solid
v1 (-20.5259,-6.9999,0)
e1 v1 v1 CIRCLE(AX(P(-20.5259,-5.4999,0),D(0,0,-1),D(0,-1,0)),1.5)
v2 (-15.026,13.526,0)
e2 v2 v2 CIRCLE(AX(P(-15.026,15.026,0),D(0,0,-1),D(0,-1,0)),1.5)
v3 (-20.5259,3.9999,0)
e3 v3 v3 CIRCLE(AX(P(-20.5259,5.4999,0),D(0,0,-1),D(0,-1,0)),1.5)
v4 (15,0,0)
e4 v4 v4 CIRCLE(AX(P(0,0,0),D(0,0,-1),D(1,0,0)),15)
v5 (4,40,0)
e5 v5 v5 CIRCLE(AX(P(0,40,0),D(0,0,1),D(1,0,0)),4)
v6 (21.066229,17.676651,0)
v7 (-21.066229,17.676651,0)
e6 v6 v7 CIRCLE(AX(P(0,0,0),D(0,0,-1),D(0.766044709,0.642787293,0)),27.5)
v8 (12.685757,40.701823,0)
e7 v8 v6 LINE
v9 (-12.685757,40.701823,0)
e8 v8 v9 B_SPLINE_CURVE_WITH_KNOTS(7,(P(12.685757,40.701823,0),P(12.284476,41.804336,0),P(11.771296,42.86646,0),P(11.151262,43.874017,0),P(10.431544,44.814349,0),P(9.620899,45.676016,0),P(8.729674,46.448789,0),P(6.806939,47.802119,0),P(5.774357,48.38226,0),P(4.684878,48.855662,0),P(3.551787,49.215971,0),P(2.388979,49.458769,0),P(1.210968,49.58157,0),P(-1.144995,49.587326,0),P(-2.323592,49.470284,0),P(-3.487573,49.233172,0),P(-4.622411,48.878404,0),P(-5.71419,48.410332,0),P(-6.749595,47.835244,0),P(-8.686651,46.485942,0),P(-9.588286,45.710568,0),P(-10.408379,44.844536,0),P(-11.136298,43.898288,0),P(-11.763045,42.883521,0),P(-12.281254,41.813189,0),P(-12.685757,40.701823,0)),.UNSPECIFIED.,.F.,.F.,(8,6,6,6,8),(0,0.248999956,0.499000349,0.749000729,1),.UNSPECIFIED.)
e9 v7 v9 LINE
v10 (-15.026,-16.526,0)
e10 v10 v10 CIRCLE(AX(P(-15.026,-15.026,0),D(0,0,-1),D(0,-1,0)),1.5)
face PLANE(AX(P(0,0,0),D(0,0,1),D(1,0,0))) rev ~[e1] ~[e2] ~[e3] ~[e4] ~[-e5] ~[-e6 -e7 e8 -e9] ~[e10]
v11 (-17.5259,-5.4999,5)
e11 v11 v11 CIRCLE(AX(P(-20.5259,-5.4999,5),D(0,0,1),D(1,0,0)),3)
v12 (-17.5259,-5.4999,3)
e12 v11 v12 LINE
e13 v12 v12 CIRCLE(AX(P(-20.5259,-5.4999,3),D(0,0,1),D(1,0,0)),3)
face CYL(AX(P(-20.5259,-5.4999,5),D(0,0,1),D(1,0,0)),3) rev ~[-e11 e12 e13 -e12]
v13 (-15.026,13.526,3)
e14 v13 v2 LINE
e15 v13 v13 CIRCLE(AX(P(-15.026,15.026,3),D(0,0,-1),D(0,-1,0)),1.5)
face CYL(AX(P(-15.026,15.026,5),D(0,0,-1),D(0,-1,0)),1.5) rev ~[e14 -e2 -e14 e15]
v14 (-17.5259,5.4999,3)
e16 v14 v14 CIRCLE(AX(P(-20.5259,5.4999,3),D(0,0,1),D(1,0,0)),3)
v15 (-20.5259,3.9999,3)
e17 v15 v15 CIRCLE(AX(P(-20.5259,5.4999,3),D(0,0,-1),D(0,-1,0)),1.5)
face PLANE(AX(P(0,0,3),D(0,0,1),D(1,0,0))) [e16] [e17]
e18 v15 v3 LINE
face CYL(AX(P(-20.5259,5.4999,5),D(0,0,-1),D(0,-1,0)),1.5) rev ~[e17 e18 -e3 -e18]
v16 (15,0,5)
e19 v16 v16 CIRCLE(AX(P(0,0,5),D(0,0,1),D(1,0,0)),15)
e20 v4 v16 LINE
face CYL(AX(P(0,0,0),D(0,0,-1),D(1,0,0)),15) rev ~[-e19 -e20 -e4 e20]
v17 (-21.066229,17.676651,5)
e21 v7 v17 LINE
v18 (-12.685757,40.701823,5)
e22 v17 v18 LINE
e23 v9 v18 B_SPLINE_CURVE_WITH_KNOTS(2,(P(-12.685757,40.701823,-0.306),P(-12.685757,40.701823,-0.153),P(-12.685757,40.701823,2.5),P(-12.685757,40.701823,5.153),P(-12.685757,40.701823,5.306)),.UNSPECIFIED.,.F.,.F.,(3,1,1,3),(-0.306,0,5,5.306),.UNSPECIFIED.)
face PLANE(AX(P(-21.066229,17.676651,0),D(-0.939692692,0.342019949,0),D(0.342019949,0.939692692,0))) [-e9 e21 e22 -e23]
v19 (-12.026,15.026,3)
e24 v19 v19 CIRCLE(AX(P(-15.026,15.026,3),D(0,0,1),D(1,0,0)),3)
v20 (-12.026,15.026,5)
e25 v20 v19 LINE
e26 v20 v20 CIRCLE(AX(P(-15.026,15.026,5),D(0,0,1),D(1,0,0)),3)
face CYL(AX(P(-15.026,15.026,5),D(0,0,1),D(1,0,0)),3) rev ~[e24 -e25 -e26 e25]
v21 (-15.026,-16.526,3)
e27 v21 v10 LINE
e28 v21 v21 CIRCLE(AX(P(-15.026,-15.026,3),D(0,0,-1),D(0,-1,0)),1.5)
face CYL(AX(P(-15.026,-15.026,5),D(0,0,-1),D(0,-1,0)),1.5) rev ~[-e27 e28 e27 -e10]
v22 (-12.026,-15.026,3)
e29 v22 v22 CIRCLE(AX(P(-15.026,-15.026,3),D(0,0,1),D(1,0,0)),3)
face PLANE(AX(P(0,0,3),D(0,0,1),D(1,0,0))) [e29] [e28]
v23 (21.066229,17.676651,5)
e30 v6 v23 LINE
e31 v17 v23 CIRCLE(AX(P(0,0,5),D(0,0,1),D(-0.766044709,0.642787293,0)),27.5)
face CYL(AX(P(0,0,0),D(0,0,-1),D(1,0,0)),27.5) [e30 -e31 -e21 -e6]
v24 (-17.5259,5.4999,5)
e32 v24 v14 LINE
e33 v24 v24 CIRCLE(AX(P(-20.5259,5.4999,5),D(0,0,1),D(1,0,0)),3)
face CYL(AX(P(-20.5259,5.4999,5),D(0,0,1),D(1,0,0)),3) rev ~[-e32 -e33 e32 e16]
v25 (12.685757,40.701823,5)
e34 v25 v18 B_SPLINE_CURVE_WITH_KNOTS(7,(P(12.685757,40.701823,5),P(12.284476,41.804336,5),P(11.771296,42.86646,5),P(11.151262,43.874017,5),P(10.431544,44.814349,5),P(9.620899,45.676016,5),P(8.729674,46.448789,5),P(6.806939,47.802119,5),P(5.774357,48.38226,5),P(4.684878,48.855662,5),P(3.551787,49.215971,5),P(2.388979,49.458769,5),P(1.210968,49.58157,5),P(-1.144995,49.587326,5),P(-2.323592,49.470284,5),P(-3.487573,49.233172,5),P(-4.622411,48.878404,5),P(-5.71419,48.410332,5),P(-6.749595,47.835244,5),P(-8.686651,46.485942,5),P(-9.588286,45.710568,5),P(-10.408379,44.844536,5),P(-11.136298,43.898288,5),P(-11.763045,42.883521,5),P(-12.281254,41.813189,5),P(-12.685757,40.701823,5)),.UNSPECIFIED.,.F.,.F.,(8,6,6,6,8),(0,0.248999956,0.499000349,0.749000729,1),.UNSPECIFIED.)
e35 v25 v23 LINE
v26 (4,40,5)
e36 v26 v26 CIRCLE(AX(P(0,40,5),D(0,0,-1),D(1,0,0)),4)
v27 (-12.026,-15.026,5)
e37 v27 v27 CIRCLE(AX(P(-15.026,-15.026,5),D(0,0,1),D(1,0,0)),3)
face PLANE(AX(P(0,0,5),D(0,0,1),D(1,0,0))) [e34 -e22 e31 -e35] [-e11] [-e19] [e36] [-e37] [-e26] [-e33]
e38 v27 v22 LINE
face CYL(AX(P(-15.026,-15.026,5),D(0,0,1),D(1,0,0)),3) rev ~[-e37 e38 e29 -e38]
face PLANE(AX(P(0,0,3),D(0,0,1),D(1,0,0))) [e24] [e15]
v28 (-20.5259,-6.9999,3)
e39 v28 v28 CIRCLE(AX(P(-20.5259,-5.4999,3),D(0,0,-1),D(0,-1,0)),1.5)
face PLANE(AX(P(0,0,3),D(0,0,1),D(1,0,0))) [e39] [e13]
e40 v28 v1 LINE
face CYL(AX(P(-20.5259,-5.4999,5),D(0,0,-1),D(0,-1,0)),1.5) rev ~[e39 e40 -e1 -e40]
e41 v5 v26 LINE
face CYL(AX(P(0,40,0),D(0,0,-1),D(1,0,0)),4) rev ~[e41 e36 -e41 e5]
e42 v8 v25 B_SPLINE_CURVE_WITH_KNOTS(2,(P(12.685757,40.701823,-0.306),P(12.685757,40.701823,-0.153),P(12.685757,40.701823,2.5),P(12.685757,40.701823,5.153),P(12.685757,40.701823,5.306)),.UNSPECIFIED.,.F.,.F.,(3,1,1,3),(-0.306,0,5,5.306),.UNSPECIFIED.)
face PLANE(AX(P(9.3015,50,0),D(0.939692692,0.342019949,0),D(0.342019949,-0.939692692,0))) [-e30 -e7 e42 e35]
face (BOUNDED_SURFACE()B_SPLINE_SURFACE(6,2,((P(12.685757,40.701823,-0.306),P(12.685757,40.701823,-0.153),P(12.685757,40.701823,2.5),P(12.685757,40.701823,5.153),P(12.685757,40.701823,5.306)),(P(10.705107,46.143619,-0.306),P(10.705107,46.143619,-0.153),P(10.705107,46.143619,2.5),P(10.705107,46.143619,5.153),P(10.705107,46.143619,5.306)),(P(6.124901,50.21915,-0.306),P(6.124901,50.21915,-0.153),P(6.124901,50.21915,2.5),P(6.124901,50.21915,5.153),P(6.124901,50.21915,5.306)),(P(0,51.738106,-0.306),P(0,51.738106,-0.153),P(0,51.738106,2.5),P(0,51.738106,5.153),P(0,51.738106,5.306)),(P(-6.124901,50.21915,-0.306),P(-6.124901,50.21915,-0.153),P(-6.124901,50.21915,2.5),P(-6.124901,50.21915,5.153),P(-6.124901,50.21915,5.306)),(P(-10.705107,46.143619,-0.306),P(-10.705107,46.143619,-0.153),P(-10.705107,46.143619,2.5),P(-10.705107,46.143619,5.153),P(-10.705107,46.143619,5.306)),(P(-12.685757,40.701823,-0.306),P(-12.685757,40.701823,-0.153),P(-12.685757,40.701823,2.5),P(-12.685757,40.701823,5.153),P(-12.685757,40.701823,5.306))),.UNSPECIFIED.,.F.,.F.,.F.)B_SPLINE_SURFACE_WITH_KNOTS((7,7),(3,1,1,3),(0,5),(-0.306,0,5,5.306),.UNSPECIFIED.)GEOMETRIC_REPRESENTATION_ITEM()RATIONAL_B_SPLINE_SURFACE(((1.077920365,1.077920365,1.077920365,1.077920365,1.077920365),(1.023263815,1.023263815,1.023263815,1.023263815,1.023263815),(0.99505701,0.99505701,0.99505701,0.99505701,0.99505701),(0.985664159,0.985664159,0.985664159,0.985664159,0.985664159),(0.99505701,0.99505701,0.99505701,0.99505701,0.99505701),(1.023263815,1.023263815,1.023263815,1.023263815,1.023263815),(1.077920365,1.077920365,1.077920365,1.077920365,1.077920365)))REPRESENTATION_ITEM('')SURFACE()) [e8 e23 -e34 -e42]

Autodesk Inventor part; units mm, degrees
ref_plane "YZ Plane" through (0, 0, 0) normal (1, 0, 0) x (0, 1, 0)
ref_plane "XZ Plane" through (0, 0, 0) normal (0, 1, 0) x (-1, 0, 0)
ref_plane "XY Plane" through (0, 0, 0) normal (0, 0, 1) x (1, 0, 0)
sketch "スケッチ12" plane through (0, 0, 0) normal (0, 0, 1) x (1, 0, 0)
  circle A0 centre (0, 0) radius 27.5
  circle A1 centre (0, 0) radius 15
  line L0 (-27.5, 0) -> (27.5, 0)
  line L1 (-27.5, 0) -> (-9.3015, 50)
  line L2 (-9.3015, 50) -> (9.3015, 50)
  line L3 (9.3015, 50) -> (27.5, 0)
  circle A2 centre (0, 40) radius 4
  line L4 (9.3015, 50) -> (-27.5, 0)
  line L5 (-9.3015, 50) -> (27.5, 0)
  point P0 (21.0662, 17.6767)
  point P1 (-21.0662, 17.6767)
  point P2 (0, 51.9615)
  point P3 (8.174, 26.2571)
  point P4 (-8.174, 26.2571)
  point P5 (-2.2669, 48.0351)
  point P6 (2.2669, 48.0351)
  point P7 (0, 37.3626)
  point P8 (-15, 0)
  point P9 (15, 0)
  dimension "d5" = 55
  dimension "d6" = 30
  dimension "d10" = 70
  dimension "d11" = 70
  dimension "d12" = 50
  dimension "d13" = 40
  dimension "d14" = 8
  dimension "d47" = 0
extrude "押し出し2" add sketch "スケッチ12" along normal blind 5 contours L0 A1 A0 | L4 A0 L5 L0 A1 | A0 L1 | L1 A0 L4 | L3 A0 | L5 A0 L3 | L1 L5 A2 L4 A0 | L4 A2 L5 A0 | A0 L5 A2 L4 L3 | L2 L4 A2 L5
sketch "スケッチ13" plane through (0, 0, 5) normal (0, 0, 1) x (1, 0, 0)
  circle A0 centre (0, 0) radius 17.5
  circle A1 centre (0, 0) radius 25
  circle A2 centre (0, 0) radius 21.25
  line L0 (0, 0) -> (-18.638, 32.282)
  line L1 (-18.638, 32.282) -> (0, 0)
  line L2 (0, 0) -> (-17.2844, -29.9374)
  line L3 (0, 0) -> (-56.8729, 0)
  line L4 (0, 0) -> (-31.7394, -18.3248)
  line L5 (0, 0) -> (-33.3883, 19.2767)
  line L6 (0, 0) -> (0, -31.9785)
  line L7 (0, 0) -> (-25.7143, 25.7143)
  line L8 (0, 0) -> (-33.0547, 8.857)
  line L9 (0, 0) -> (-32.621, -8.7408)
  line L10 (0, 0) -> (-23.652, -23.652)
  point P0 (-18.403, 10.625)
  point P1 (-21.25, 0)
  point P2 (-18.403, -10.625)
  point P3 (-10.625, -18.403)
  point P4 (0, -21.25)
  point P5 (-16.5273, 4.4285)
  point P6 (-15.026, 15.026)
  point P7 (-20.5259, 5.4999)
  point P8 (-20.5259, -5.4999)
  point P9 (-15.026, -15.026)
  dimension "d19" = 42.5
  dimension "d17" = 35
  dimension "d18" = 50
  dimension "d20" = 60
  dimension "d21" = 60
  dimension "d22" = 30
  dimension "d23" = 30
  dimension "d31" = 150
  dimension "d32" = 15
  dimension "d34" = 15
  dimension "d35" = 15
  dimension "d36" = 15
hole "穴1" at (-15.026, 15.026, 5) at (-20.5259, 5.4999, 5) at (-20.5259, -5.4999, 5) at (-15.026, -15.026, 5) direction (0, 0, -1) diameter 3 end through all
sketch "スケッチ14" plane through (0, 0, 5) normal (0, 0, 1) x (1, 0, 0)
  circle A0 centre (-15.026, 15.026) radius 1.5 projected
  circle A1 centre (-15.026, 15.026) radius 3
  circle A2 centre (-20.5259, 5.4999) radius 1.5 projected
  circle A3 centre (-20.5259, 5.4999) radius 3
  circle A4 centre (-20.5259, -5.4999) radius 1.5 projected
  circle A5 centre (-20.5259, -5.4999) radius 3
  circle A6 centre (-15.026, -15.026) radius 1.5 projected
  circle A7 centre (-15.026, -15.026) radius 3
  point P0 (0, 0)
  dimension "d40" = 6
  dimension "d41" = 6
  dimension "d42" = 6
  dimension "d43" = 6
extrude "押し出し3" cut sketch "スケッチ14" against normal blind 2 contours A0 | A1 | A2 | A3 | A4 | A5 | A6 | A7
fillet "フィレット3" radius 13.5 2 edges at (9.3015, 50, 2.5) (-9.3015, 50, 2.5)
equation "\"d10\" = d11"
equation "\"d35\" = d34"
equation "\"d36\" = d35"
equation "\"d41\" = d40"
equation "\"d42\" = d41"
equation "\"d43\" = d42"
properties part number "legparts_04(seven)" material "ABS プラスチック"
